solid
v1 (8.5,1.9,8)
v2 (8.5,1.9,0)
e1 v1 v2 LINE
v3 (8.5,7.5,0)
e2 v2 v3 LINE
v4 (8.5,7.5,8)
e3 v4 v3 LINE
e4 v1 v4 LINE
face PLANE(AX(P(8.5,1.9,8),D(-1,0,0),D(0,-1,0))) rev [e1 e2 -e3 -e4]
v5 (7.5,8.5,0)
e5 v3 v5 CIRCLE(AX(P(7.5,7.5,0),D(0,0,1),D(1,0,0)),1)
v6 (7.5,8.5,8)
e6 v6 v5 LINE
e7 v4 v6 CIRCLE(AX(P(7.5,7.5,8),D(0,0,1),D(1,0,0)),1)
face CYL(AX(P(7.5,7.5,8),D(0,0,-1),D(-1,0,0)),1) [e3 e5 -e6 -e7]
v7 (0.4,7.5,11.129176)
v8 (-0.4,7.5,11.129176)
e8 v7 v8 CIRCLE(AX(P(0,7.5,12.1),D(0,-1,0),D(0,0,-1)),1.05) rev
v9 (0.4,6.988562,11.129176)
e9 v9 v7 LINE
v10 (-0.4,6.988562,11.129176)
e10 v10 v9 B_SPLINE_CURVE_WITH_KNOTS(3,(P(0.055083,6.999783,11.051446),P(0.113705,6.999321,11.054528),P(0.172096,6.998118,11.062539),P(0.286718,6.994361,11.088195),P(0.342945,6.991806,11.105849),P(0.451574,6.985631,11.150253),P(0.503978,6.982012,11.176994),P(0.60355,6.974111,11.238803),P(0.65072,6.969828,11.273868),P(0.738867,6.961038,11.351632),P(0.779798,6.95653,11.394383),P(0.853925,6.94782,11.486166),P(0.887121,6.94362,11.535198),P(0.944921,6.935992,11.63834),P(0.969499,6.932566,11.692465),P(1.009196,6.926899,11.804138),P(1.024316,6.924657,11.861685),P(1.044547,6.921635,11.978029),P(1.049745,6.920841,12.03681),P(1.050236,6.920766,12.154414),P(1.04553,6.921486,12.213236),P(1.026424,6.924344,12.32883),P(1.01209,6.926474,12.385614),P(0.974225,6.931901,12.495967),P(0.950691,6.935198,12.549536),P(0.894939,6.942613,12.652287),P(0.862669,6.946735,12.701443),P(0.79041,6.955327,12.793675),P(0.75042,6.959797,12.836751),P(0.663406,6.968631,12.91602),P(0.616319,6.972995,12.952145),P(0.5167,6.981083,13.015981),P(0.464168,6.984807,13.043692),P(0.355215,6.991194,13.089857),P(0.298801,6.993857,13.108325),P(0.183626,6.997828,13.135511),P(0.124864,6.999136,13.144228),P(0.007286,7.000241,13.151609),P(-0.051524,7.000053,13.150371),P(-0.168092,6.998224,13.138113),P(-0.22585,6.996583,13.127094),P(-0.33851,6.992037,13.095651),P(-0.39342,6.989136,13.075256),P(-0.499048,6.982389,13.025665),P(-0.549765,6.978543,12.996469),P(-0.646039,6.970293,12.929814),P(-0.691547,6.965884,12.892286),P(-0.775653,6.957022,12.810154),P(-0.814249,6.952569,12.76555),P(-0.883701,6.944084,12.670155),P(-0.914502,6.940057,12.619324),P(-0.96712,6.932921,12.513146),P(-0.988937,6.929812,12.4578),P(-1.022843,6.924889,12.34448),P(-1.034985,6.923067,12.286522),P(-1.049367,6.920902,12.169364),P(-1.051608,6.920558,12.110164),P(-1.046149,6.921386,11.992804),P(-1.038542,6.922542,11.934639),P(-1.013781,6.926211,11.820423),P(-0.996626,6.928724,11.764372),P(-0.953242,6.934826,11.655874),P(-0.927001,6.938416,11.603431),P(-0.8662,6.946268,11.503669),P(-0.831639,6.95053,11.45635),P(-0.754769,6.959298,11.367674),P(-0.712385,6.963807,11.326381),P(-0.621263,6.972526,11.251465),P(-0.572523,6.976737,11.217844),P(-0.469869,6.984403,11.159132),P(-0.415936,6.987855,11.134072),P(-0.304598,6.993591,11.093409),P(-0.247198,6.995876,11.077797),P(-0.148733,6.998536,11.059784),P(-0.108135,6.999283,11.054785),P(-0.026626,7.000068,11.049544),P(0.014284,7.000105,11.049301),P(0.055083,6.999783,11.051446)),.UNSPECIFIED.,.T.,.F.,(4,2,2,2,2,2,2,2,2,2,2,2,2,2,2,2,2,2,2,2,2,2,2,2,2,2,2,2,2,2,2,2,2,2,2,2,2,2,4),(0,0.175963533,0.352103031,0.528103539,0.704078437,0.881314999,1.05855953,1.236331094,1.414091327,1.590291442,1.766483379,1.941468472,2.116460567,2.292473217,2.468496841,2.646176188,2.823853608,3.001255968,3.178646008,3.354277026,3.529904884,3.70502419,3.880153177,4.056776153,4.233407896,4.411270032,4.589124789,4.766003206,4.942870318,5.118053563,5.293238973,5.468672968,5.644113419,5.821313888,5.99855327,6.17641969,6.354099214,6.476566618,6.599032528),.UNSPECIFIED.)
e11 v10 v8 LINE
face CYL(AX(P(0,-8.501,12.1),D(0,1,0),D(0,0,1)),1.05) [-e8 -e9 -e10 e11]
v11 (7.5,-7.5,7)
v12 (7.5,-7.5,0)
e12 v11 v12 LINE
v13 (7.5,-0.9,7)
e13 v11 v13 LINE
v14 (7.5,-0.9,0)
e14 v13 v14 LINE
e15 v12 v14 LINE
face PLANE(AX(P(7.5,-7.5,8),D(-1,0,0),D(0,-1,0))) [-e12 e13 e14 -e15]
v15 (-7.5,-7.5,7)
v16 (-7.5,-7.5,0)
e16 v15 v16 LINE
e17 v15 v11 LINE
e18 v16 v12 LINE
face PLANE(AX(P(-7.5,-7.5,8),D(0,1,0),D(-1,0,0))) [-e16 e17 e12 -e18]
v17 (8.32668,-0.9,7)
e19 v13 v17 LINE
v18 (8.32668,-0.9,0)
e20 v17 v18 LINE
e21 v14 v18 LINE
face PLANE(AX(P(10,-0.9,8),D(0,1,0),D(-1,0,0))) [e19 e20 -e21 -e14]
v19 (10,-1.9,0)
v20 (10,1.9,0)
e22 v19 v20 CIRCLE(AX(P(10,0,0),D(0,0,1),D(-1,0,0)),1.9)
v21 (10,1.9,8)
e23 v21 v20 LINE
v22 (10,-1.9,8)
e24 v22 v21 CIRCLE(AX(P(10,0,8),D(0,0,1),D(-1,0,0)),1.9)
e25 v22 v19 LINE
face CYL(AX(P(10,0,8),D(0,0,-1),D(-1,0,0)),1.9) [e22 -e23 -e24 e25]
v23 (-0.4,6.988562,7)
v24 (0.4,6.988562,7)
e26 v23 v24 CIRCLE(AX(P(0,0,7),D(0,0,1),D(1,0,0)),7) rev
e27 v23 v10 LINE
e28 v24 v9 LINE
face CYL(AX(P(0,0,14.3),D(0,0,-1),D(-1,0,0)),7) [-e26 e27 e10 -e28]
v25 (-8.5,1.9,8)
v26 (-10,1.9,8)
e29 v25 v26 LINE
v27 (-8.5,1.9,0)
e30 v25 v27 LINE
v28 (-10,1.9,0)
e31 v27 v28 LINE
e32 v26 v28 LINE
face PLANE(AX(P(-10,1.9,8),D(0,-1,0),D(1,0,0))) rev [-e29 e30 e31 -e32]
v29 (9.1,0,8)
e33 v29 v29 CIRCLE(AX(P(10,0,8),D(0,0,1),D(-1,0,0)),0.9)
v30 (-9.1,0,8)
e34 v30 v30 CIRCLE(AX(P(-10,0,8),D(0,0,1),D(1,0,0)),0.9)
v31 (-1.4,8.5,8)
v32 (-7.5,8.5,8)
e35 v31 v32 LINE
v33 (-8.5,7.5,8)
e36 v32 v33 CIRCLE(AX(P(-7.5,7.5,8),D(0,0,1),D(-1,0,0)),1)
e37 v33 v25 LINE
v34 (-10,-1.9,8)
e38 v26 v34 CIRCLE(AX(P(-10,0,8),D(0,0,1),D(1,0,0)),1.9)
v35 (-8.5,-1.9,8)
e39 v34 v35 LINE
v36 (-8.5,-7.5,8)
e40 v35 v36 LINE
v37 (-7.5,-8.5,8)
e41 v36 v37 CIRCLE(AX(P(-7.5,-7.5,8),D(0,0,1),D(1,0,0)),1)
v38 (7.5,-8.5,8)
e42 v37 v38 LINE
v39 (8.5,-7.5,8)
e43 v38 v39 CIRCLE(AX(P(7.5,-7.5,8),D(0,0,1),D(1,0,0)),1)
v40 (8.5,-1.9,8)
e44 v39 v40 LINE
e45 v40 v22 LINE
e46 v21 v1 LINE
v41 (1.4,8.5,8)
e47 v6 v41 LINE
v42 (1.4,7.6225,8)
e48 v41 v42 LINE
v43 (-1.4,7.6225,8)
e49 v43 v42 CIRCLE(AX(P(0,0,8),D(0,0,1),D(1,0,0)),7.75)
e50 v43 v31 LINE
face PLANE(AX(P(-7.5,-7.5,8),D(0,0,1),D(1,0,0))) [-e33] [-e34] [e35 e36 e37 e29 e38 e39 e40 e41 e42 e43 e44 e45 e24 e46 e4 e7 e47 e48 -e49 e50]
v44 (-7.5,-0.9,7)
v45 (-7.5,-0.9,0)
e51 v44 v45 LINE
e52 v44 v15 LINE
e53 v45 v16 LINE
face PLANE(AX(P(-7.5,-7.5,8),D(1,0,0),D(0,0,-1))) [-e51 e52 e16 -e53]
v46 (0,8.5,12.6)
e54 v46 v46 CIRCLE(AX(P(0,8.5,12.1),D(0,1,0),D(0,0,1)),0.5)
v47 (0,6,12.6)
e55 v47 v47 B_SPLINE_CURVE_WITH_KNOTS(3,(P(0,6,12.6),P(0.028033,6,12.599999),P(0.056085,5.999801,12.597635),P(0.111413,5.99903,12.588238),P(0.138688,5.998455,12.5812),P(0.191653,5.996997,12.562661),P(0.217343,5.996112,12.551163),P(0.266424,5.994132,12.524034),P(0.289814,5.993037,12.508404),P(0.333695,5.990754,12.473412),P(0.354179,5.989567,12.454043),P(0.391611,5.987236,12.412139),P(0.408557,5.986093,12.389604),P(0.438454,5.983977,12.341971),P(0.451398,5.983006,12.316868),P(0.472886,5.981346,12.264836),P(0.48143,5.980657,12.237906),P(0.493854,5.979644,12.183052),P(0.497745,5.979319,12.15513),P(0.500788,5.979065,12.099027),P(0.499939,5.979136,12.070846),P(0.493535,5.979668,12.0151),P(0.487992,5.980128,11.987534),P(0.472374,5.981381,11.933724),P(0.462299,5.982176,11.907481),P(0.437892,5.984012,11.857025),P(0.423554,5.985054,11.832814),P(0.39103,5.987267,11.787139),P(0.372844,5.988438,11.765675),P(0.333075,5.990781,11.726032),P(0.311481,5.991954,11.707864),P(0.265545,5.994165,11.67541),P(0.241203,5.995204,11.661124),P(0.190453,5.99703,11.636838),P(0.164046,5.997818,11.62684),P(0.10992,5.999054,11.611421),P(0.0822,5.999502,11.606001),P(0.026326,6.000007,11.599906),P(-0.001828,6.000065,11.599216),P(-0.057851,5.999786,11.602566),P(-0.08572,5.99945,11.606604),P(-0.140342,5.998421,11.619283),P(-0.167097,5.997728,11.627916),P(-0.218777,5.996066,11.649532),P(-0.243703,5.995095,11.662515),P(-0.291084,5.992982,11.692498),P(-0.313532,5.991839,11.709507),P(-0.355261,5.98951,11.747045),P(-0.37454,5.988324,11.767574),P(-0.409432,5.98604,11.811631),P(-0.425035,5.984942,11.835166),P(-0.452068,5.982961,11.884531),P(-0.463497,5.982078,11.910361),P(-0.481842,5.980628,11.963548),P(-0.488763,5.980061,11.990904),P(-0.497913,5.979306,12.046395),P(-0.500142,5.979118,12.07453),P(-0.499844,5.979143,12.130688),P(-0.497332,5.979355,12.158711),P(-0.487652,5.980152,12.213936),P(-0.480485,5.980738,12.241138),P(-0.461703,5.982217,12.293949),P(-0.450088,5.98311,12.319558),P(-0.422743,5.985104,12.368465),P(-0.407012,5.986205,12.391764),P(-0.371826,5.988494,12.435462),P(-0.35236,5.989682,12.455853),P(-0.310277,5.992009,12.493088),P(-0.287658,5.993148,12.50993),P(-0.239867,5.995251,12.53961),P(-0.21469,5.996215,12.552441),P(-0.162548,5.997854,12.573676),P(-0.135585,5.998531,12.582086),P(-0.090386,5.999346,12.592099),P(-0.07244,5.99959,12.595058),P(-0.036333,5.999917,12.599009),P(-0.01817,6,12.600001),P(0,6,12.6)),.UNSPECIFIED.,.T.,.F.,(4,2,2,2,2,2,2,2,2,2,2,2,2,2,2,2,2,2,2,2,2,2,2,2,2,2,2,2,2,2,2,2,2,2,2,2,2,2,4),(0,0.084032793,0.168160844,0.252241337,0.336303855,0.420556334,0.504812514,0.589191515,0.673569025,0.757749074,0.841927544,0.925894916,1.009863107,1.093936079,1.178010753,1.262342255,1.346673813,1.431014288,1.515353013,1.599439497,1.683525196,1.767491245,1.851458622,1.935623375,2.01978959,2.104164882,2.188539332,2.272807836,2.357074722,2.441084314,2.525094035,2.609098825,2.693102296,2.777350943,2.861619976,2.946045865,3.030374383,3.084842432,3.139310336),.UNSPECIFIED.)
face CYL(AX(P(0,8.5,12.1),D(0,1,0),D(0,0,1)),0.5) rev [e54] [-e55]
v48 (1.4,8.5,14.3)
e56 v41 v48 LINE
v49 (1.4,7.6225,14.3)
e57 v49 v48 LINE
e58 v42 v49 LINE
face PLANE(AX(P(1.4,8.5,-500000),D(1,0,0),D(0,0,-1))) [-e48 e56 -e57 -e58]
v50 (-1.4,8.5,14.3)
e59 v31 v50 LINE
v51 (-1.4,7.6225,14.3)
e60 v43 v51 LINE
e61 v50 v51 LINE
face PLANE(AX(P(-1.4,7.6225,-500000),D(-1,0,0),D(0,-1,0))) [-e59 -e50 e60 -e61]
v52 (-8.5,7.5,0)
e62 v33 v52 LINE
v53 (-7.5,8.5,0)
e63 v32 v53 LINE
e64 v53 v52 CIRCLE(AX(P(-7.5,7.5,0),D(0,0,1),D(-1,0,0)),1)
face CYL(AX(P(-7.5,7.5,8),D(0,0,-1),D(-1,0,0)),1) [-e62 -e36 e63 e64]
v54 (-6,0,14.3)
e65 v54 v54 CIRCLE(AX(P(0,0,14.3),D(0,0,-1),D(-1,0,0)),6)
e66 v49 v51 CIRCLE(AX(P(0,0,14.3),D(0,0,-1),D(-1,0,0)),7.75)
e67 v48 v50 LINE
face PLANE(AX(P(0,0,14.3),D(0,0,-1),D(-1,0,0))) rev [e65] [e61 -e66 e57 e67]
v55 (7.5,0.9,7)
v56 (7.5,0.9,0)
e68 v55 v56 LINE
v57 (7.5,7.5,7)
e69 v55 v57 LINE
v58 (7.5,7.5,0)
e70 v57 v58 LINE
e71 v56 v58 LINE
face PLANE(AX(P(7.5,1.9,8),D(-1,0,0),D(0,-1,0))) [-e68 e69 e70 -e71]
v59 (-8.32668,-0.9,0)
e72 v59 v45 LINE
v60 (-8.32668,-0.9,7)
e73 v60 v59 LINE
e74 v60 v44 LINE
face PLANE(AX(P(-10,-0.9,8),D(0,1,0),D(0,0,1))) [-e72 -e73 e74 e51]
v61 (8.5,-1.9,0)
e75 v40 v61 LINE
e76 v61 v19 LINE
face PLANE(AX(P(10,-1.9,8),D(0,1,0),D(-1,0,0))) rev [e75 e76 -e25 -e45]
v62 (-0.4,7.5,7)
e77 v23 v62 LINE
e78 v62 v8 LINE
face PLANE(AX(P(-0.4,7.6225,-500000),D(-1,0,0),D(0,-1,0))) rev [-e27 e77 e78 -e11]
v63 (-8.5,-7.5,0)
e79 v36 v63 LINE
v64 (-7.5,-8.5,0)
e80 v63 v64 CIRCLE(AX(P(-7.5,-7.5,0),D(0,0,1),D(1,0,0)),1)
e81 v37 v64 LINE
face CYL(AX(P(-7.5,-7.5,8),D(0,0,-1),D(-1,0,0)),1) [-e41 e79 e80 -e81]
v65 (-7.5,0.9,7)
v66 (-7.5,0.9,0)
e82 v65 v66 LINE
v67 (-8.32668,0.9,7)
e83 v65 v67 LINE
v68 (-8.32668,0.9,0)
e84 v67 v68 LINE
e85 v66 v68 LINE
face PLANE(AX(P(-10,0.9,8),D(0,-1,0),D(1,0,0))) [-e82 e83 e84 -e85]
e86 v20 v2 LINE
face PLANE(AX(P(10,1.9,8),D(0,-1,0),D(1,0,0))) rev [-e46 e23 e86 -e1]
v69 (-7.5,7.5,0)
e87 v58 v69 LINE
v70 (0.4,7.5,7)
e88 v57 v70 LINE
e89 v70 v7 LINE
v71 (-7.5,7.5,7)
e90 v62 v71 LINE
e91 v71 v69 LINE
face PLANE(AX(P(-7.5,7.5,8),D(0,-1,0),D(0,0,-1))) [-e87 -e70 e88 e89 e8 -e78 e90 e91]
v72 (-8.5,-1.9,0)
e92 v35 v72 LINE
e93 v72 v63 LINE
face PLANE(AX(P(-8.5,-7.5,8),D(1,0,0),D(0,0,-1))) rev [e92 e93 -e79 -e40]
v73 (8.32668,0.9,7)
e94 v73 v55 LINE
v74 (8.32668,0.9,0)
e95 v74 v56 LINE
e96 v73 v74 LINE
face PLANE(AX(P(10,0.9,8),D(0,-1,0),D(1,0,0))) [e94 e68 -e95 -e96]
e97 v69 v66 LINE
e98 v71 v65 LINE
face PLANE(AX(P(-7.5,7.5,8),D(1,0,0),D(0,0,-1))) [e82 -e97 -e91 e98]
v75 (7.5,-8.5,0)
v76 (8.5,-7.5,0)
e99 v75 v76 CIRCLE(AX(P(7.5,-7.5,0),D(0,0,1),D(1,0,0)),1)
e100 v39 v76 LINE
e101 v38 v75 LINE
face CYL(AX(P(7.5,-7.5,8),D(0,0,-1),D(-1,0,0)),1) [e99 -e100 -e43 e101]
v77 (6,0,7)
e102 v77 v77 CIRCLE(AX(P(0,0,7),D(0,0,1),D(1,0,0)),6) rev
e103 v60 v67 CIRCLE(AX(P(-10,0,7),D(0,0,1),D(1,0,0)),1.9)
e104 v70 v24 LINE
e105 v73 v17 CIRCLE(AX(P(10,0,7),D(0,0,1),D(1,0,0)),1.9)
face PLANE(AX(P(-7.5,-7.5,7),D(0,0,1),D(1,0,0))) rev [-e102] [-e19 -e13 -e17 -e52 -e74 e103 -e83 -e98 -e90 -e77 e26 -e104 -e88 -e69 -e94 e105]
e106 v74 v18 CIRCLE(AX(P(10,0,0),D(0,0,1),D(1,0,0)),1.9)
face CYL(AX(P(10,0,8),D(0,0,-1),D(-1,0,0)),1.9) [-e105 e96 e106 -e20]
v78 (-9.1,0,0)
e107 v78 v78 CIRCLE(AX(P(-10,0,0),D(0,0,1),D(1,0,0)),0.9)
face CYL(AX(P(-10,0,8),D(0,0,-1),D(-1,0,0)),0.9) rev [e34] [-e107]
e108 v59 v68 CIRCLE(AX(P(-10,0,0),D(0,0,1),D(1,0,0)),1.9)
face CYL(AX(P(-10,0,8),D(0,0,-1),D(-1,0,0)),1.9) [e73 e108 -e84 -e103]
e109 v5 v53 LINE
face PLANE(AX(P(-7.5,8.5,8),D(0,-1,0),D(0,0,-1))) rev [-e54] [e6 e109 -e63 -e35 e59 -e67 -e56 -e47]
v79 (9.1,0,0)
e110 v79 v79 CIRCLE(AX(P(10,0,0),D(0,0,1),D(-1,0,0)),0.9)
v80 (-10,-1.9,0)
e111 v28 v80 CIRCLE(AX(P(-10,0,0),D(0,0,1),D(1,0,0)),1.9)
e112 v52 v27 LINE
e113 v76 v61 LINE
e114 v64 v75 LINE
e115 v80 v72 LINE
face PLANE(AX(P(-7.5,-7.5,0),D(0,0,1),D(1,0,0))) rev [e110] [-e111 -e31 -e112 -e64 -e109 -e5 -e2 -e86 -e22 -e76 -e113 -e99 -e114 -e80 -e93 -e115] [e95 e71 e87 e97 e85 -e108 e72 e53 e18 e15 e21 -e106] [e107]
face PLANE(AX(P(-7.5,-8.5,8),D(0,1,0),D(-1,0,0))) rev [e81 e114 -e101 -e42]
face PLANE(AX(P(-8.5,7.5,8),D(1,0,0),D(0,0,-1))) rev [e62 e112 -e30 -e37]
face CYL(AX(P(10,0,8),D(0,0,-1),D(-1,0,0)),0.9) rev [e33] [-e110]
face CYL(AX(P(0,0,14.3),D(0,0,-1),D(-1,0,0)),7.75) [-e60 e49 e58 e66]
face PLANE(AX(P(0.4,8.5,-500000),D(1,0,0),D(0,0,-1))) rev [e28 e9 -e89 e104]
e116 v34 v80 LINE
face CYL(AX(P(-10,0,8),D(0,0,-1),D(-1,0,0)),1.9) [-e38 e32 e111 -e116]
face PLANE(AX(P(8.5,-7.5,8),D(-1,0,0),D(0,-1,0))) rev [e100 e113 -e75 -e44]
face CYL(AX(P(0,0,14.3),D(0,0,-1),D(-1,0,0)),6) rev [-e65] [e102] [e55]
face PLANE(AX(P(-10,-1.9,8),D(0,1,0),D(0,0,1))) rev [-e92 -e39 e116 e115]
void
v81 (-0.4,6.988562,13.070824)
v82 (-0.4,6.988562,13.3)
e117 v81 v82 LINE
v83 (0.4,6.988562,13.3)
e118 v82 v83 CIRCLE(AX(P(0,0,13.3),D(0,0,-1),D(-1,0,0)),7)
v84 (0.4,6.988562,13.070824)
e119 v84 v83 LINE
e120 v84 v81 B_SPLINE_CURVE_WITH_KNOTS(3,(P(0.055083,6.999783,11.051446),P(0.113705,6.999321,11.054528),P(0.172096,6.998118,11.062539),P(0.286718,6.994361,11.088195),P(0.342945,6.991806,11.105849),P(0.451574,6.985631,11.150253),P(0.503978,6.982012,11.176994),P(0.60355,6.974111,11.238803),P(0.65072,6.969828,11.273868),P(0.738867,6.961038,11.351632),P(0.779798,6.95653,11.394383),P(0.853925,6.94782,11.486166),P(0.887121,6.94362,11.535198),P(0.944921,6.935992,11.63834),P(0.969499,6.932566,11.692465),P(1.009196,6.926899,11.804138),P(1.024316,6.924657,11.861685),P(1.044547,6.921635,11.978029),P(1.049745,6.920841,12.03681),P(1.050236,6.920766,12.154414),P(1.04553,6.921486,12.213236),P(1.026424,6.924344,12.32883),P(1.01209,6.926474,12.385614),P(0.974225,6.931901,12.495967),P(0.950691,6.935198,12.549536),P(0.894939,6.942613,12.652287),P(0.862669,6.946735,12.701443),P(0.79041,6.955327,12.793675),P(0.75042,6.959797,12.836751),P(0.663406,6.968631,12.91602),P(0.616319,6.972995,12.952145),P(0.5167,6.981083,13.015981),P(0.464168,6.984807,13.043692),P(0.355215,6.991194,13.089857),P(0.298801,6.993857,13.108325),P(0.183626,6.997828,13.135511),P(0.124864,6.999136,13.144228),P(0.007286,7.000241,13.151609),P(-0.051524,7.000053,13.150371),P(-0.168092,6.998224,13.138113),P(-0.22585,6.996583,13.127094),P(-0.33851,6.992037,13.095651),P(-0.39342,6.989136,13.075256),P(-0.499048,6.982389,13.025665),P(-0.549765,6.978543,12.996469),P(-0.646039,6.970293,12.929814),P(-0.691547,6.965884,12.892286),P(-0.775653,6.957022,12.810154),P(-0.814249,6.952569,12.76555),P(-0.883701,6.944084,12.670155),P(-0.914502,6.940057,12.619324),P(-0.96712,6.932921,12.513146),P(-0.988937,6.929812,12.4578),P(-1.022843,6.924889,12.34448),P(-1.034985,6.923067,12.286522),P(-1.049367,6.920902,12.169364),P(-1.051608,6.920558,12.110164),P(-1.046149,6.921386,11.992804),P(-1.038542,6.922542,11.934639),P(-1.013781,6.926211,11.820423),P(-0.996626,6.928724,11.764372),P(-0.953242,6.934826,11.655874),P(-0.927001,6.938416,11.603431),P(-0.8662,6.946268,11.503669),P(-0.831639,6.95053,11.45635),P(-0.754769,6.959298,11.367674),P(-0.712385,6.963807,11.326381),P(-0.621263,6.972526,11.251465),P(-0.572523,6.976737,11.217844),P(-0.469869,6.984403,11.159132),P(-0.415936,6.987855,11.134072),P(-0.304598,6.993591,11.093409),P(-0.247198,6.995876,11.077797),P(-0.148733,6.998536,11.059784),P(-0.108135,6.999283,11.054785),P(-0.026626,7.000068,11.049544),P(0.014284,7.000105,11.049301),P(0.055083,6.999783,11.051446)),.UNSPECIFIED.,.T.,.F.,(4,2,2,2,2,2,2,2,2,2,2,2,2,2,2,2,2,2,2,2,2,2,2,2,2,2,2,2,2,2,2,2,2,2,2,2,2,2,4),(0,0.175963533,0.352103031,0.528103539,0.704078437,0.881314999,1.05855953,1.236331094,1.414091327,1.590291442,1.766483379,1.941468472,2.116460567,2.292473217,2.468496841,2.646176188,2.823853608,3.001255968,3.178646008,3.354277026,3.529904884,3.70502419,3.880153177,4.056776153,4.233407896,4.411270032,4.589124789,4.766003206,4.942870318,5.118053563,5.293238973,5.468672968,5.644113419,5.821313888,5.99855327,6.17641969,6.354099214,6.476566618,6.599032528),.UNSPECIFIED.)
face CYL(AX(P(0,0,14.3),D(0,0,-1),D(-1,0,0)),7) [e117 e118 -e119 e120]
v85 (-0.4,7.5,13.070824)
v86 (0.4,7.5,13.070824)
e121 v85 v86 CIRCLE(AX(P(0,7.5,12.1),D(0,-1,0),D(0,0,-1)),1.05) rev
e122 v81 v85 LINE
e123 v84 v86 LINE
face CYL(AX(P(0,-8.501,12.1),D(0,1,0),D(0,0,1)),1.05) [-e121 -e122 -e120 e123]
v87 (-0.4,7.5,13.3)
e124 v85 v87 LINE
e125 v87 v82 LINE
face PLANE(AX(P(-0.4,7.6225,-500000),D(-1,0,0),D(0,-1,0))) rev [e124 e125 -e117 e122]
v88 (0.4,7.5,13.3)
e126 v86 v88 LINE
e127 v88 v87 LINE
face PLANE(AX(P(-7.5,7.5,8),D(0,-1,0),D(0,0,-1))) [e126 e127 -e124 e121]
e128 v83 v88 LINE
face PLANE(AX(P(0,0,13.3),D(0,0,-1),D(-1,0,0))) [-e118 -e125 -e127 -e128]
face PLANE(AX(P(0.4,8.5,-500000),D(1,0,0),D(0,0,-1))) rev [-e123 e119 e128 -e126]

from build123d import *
from OCP.BRepAlgoAPI import BRepAlgoAPI_Cut
from OCP.TopTools import TopTools_ListOfShape

# Parameters (mm, degrees)
SKETCH1_R                 = 0.9
BOSS_EXTRUDE1_DEPTH       = 8
SKETCH2_R                 = 7.75
SKETCH2_R_2               = 6
BOSS_EXTRUDE2_DEPTH       = 6.3
BOSS_EXTRUDE3_REACH       = 22.454
SKETCH4_W                 = 2.8
SKETCH4_H                 = 0.87750041
CUT_EXTRUDE1_REACH        = 27.201
CUT_EXTRUDE1_END_RADIUS   = 6
SKETCH3_R                 = 0.05
SHELL1_DEPTH              = 7
SHELL1_START              = 7
SHELL1_2_DEPTH            = 4.129175608
SHELL1_START_2            = 13.07082292
SHELL1_3_DEPTH            = 0.22917708
SHELL1_START_3            = 6.988561285
SHELL1_4_DEPTH            = 0.511438715
SKETCH2_2_R               = 6
CUT_EXTRUDE2_DEPTH        = 17.669133202
F_1_0MM_DOWEL_HOLE1_D     = 1
F_1_0MM_DOWEL_HOLE1_DEPTH = 3
F_1_0MM_DOWEL_HOLE1_TIP   = 0.30043031


with BuildPart() as part:
    # Sketch1 → Boss-Extrude1 (new body)
    with BuildSketch(Plane.XY):
        with BuildLine():
            Line((-7.5, -8.5), (7.5, -8.5))
            ThreePointArc((7.5, -8.5), (8.207106781, -8.207106781), (8.5, -7.5))
            Line((8.5, -7.5), (8.5, -1.9))
            Line((8.5, -1.9), (10, -1.9))
            ThreePointArc((10, -1.9), (11.9, 0), (10, 1.9))
            Line((10, 1.9), (8.5, 1.9))
            Line((8.5, 1.9), (8.5, 7.5))
            ThreePointArc((8.5, 7.5), (8.207106781, 8.207106781), (7.5, 8.5))
            Line((7.5, 8.5), (-7.5, 8.5))
            ThreePointArc((-7.5, 8.5), (-8.207106781, 8.207106781), (-8.5, 7.5))
            Line((-8.5, 7.5), (-8.5, 1.9))
            Line((-8.5, 1.9), (-10, 1.9))
            ThreePointArc((-10, 1.9), (-11.9, 0), (-10, -1.9))
            Line((-10, -1.9), (-8.5, -1.9))
            Line((-8.5, -1.9), (-8.5, -7.5))
            ThreePointArc((-8.5, -7.5), (-8.207106781, -8.207106781), (-7.5, -8.5))
        make_face()
        with Locations((-10, 0)):
            Circle(SKETCH1_R, mode=Mode.SUBTRACT)
        with Locations(Location((10, 0, 0), (0, 0, 180))):
            Circle(SKETCH1_R, mode=Mode.SUBTRACT)
    extrude(amount=BOSS_EXTRUDE1_DEPTH)

    # Sketch2 → Boss-Extrude2 (add)
    with BuildSketch(Plane(origin=(0, 0, 8), x_dir=(-1, 0, 0), z_dir=(0, 0, -1))):
        Circle(SKETCH2_R)
        Circle(SKETCH2_R_2, mode=Mode.SUBTRACT)
    extrude(amount=-BOSS_EXTRUDE2_DEPTH)

    # Sketch4 → Boss-Extrude3 (add, up to next)
    with BuildSketch(Plane.XY.offset(14.3), mode=Mode.PRIVATE) as boss_extrude3_sk1:
        with Locations((0, 8.061249795)):
            Rectangle(SKETCH4_W, SKETCH4_H)
    boss_extrude3_tool1 = extrude(boss_extrude3_sk1.sketch, amount=-BOSS_EXTRUDE3_REACH, mode=Mode.PRIVATE) - part.part
    add(boss_extrude3_tool1.solids().sort_by_distance((0, 8.06125, 14.3))[0])

    # Cut-Extrude1: up to this cylinder (the profile starts outside it)
    cut_extrude1_end = Plane(origin=(0, 0, 12.1), z_dir=(0, 0, -1)) * Cylinder(CUT_EXTRUDE1_END_RADIUS, 67.402, mode=Mode.PRIVATE)
    # Sketch3 → Cut-Extrude1 (cut, up to the surface)
    with BuildSketch(Plane(origin=(0, 8.5, 0), x_dir=(-1, 0, 0), z_dir=(0, 1, 0)), mode=Mode.PRIVATE) as cut_extrude1_sk1:
        with Locations(Location((0, 12.1, 0), (0, 0, 90))):
            Circle(SKETCH3_R)
    cut_extrude1_tool1 = extrude(cut_extrude1_sk1.sketch, amount=-CUT_EXTRUDE1_REACH, mode=Mode.PRIVATE) - cut_extrude1_end
    add(cut_extrude1_tool1.solids().sort_by_distance((0, 8.5, 12.1))[0], mode=Mode.SUBTRACT)


with BuildPart() as shell1_tool:
    # Shell1: read off the stored shape, not the designer's step
    # Shell1 outline → Shell1 (new body)
    with BuildSketch(Plane.XY):
        with BuildLine():
            Line((7.5, -0.9), (8.326679947, -0.9))
            ThreePointArc((8.326679947, -0.9), (8.1, 0), (8.326679947, 0.9))
            Line((8.326679947, 0.9), (7.5, 0.9))
            Line((7.5, 0.9), (7.5, 7.5))
            Line((7.5, 7.5), (-7.5, 7.5))
            Line((-7.5, 7.5), (-7.5, 0.9))
            Line((-7.5, 0.9), (-8.326679947, 0.9))
            ThreePointArc((-8.326679947, 0.9), (-8.1, 0), (-8.326679947, -0.9))
            Line((-8.326679947, -0.9), (-7.5, -0.9))
            Line((-7.5, -0.9), (-7.5, -7.5))
            Line((-7.5, -7.5), (7.5, -7.5))
            Line((7.5, -7.5), (7.5, -0.9))
        make_face()
    extrude(amount=SHELL1_DEPTH)


with BuildPart() as part_1:
    add(part.part)

    # Shell1: cut by shell1_tool, with a tolerance
    shell1_stock = TopTools_ListOfShape()
    shell1_stock.Append(part_1.part.wrapped)
    shell1_tools = TopTools_ListOfShape()
    shell1_tools.Append(shell1_tool.part.wrapped)
    shell1_cut = BRepAlgoAPI_Cut()
    shell1_cut.SetArguments(shell1_stock)
    shell1_cut.SetTools(shell1_tools)
    shell1_cut.SetFuzzyValue(0.00001)
    shell1_cut.Build()
    add(Compound.cast(shell1_cut.Shape()).solids(), mode=Mode.REPLACE)


with BuildPart() as shell1_2_tool:
    # Shell1 2 outline → Shell1 2 (new body)
    with BuildSketch(Plane.XY.offset(SHELL1_START)):
        with BuildLine():
            Line((0.4, 6.988562084), (0.4, 7.5))
            Line((0.4, 7.5), (-0.4, 7.5))
            Line((-0.4, 7.5), (-0.4, 6.988562084))
            ThreePointArc((-0.4, 6.988562084), (0, 7), (0.4, 6.988562084))
        make_face()
    extrude(amount=SHELL1_2_DEPTH)


with BuildPart() as part_2:
    add(part_1.part)

    # Shell1 2: cut by shell1_2_tool, with a tolerance
    shell1_2_stock = TopTools_ListOfShape()
    shell1_2_stock.Append(part_2.part.wrapped)
    shell1_2_tools = TopTools_ListOfShape()
    shell1_2_tools.Append(shell1_2_tool.part.wrapped)
    shell1_2_cut = BRepAlgoAPI_Cut()
    shell1_2_cut.SetArguments(shell1_2_stock)
    shell1_2_cut.SetTools(shell1_2_tools)
    shell1_2_cut.SetFuzzyValue(0.00001)
    shell1_2_cut.Build()
    add(Compound.cast(shell1_2_cut.Shape()).solids(), mode=Mode.REPLACE)


with BuildPart() as shell1_3_tool:
    # Shell1 3 outline → Shell1 3 (new body)
    with BuildSketch(Plane.XY.offset(SHELL1_START_2)):
        with BuildLine():
            Line((0.4, 6.988562084), (0.4, 7.5))
            Line((0.4, 7.5), (-0.4, 7.5))
            Line((-0.4, 7.5), (-0.4, 6.988562084))
            ThreePointArc((-0.4, 6.988562084), (0, 7), (0.4, 6.988562084))
        make_face()
    extrude(amount=SHELL1_3_DEPTH)


with BuildPart() as part_3:
    add(part_2.part)

    # Shell1 3: cut by shell1_3_tool, with a tolerance
    shell1_3_stock = TopTools_ListOfShape()
    shell1_3_stock.Append(part_3.part.wrapped)
    shell1_3_tools = TopTools_ListOfShape()
    shell1_3_tools.Append(shell1_3_tool.part.wrapped)
    shell1_3_cut = BRepAlgoAPI_Cut()
    shell1_3_cut.SetArguments(shell1_3_stock)
    shell1_3_cut.SetTools(shell1_3_tools)
    shell1_3_cut.SetFuzzyValue(0.00001)
    shell1_3_cut.Build()
    add(Compound.cast(shell1_3_cut.Shape()).solids(), mode=Mode.REPLACE)


with BuildPart() as shell1_4_tool:
    # Shell1 4 outline → Shell1 4 (new body)
    with BuildSketch(Plane(origin=(0, 0, 0), x_dir=(1, 0, 0), z_dir=(0, 1, 0)).offset(SHELL1_START_3)):
        with BuildLine():
            Line((-0.4, -11.129175608), (0.4, -11.129175608))
            ThreePointArc((0.4, -11.129175608), (0, -11.05), (-0.4, -11.129175608))
        make_face()
        with BuildLine():
            Line((0.4, -13.070824392), (-0.4, -13.070824392))
            ThreePointArc((-0.4, -13.070824392), (0, -13.15), (0.4, -13.070824392))
        make_face()
    extrude(amount=SHELL1_4_DEPTH)


with BuildPart() as part_4:
    add(part_3.part)


with BuildPart() as part_5:
    # Shell1 4: joined with shell1_4_tool
    add(part_4.part.fuse(shell1_4_tool.part, tol=0.00001))

    # Sketch2<2> → Cut-Extrude2 (cut, through all)
    with BuildSketch(Plane(origin=(0, 0, 8), x_dir=(-1, 0, 0), z_dir=(0, 0, -1))):
        Circle(SKETCH2_2_R)
    extrude(amount=CUT_EXTRUDE2_DEPTH, mode=Mode.SUBTRACT)

    # Ø1.0mm Dowel Hole1
    with Locations(Plane(origin=(0, 8.5, 12.1), x_dir=(0, 0, 1), z_dir=(0, 1, 0))):
        with Locations((0, 0)):
            Hole(F_1_0MM_DOWEL_HOLE1_D / 2, depth=F_1_0MM_DOWEL_HOLE1_DEPTH)
            with Locations((0, 0, -(F_1_0MM_DOWEL_HOLE1_DEPTH + F_1_0MM_DOWEL_HOLE1_TIP / 2))):  # 118° drill point
                Cone(0, F_1_0MM_DOWEL_HOLE1_D / 2, F_1_0MM_DOWEL_HOLE1_TIP, mode=Mode.SUBTRACT)


solid = part_5.part
